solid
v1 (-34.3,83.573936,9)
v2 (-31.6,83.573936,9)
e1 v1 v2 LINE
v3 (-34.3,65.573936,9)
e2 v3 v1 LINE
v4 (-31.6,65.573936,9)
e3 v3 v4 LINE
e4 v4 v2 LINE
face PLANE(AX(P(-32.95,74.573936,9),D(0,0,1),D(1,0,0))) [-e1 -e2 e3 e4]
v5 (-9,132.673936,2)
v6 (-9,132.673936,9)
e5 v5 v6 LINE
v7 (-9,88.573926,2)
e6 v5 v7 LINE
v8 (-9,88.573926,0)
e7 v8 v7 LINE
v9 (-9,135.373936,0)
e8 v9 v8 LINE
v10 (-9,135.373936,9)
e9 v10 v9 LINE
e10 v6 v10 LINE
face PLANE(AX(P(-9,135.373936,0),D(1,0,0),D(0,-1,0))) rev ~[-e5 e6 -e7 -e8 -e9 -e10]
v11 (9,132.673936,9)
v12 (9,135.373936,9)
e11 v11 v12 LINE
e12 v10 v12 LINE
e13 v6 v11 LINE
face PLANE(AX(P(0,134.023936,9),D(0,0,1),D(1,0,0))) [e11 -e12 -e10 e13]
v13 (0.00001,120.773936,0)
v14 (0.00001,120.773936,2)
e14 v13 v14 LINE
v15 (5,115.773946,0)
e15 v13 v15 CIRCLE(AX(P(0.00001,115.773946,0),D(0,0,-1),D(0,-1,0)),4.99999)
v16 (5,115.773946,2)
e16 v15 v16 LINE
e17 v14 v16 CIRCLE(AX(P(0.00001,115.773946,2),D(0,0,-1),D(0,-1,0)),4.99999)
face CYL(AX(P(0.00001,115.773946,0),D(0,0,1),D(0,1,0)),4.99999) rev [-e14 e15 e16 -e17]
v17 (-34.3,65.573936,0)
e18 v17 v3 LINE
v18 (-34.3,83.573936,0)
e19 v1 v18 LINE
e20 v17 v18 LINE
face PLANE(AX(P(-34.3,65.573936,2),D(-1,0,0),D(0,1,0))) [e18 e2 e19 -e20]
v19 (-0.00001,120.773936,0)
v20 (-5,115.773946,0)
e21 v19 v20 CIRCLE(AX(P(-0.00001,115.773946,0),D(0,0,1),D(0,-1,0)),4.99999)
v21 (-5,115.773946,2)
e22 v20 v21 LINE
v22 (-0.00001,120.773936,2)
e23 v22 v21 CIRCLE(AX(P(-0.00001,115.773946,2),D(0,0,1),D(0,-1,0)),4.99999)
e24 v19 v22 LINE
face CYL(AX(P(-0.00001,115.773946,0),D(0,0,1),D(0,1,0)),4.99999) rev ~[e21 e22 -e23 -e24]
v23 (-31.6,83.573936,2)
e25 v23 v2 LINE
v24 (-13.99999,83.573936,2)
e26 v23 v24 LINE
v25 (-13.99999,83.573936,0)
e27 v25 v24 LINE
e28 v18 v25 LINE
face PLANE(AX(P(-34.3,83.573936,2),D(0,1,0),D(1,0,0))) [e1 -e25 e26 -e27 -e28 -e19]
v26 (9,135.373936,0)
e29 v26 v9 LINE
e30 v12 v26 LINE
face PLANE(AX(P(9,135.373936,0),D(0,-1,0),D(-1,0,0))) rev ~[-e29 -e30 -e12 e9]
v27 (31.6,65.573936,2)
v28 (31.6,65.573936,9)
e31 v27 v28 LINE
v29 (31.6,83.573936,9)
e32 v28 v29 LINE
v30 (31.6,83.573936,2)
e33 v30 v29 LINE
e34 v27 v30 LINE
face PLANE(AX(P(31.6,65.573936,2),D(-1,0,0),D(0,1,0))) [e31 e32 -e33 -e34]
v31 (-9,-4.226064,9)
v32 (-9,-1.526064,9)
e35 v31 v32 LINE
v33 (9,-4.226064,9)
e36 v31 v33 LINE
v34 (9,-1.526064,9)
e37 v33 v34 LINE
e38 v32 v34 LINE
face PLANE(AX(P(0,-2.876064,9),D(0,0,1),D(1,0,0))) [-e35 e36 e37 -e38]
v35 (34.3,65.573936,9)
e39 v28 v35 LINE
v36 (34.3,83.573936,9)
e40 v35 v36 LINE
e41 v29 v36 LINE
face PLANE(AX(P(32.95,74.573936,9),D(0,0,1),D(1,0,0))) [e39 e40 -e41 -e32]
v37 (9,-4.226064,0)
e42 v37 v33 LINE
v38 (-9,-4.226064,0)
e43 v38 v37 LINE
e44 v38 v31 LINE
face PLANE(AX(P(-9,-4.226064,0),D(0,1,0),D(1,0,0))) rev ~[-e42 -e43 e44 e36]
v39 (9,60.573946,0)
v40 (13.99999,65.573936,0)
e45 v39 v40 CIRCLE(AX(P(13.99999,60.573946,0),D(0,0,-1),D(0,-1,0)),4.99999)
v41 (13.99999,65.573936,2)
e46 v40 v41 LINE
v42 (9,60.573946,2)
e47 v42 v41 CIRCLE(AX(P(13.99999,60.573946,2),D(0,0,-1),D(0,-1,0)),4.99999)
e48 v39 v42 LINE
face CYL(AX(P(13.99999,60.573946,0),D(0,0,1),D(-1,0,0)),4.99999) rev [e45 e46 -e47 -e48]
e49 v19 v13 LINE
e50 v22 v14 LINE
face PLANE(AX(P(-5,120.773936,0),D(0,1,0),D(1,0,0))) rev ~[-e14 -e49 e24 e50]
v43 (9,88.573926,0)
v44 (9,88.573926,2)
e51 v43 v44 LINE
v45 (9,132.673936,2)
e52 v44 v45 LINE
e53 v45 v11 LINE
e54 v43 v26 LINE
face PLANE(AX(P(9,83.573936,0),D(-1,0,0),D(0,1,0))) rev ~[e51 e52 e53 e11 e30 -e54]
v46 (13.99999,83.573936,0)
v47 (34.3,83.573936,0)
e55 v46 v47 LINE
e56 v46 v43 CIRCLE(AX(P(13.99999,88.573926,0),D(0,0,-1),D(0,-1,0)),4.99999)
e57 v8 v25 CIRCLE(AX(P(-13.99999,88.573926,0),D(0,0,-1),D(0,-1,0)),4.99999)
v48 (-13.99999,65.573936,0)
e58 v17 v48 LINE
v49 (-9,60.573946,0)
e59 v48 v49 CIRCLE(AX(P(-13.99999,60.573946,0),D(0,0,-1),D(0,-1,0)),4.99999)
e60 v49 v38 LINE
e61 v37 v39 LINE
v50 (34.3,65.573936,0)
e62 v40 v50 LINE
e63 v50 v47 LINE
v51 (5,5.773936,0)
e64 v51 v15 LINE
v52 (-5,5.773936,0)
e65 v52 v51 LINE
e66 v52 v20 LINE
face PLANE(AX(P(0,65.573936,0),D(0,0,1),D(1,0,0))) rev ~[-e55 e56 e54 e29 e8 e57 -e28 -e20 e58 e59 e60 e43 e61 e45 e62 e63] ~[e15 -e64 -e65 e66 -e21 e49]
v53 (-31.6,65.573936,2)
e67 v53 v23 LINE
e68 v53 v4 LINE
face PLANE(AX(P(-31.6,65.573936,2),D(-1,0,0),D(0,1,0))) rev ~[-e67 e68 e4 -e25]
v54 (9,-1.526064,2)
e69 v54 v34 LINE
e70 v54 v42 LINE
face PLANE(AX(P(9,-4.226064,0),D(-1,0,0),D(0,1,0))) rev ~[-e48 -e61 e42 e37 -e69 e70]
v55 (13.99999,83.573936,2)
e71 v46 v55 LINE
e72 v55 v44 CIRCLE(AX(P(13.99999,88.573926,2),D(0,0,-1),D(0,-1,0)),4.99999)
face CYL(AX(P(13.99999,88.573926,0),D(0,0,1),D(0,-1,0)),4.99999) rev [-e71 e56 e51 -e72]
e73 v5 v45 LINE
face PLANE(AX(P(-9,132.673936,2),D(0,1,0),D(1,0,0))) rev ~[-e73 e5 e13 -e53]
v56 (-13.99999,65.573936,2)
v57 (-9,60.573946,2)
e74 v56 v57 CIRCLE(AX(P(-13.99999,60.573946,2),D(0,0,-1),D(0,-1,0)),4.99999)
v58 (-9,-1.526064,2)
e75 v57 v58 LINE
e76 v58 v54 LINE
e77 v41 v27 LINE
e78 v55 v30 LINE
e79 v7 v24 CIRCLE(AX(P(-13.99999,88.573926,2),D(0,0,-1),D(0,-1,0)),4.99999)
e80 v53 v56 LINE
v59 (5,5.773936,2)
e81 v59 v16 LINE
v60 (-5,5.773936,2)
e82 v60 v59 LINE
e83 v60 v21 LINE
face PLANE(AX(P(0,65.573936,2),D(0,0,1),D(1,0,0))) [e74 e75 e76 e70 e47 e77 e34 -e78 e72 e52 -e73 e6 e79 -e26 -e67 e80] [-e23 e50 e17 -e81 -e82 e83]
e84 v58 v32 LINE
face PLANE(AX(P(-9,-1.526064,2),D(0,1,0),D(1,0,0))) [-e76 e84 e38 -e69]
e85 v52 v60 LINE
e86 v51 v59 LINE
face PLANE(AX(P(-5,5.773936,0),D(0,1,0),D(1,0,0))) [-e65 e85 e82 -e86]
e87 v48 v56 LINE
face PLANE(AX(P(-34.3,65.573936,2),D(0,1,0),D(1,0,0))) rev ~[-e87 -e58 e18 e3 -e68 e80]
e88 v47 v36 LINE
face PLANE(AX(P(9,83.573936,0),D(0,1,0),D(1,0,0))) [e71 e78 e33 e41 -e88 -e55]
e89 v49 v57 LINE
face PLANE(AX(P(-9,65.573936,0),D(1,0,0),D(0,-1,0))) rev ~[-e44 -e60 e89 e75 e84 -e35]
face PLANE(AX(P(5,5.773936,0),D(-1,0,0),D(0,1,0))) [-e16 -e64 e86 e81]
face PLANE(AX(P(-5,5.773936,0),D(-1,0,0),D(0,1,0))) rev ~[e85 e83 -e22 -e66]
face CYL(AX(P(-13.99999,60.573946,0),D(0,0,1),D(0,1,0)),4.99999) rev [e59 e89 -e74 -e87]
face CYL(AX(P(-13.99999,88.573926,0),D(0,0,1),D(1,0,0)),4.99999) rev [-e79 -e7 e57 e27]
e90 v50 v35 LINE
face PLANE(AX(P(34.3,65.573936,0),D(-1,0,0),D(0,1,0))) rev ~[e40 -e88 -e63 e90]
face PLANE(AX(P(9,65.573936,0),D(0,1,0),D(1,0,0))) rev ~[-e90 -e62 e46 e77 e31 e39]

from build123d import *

# Parameters (mm, degrees)
F0_W     = 10
F0_H     = 115
F0_W_2   = 25.3
F0_H_2   = 18
F1_DEPTH = 2
F3_W     = 2.7
F3_H     = 18
F3_W_2   = 18
F3_H_2   = 2.7
F4_DEPTH = 7
F5_R     = 4.99999


# Not quite as in the source:
# - a fillet or chamfer is up to 0.001 mm smaller than in the source, because OpenCascade refuses the exact size


with BuildPart() as f1:
    # F0 (on Top) → F1 (new body)
    with BuildSketch(Plane.XY):
        Polygon((9, 135.3739356415), (-9, 135.3739356415), (-9, 83.5739356415), (-9, 65.5739356415), (-9, -4.2260643585), (9, -4.2260643585), (9, 65.5739356415), (9, 83.5739356415), align=None)
        with Locations((0, 63.2739356415)):
            Rectangle(F0_W, F0_H, mode=Mode.SUBTRACT)
        with Locations((-21.65, 74.5739356415)):
            Rectangle(F0_W_2, F0_H_2)
        with Locations((21.65, 74.5739356415)):
            Rectangle(F0_W_2, F0_H_2)
    extrude(amount=F1_DEPTH)

    # F3 (on face) → F4 (join)
    with BuildSketch(Plane.XY.offset(2)):
        with Locations((-32.95, 74.5739356415)):
            Rectangle(F3_W, F3_H)
        with Locations((32.95, 74.5739356415)):
            Rectangle(F3_W, F3_H)
        with Locations((0, 134.0239356415)):
            Rectangle(F3_W_2, F3_H_2)
        with Locations((0, -2.8760643585)):
            Rectangle(F3_W_2, F3_H_2)
    extrude(amount=F4_DEPTH)

    # F5 (radius 5 in the source; OpenCascade refuses exactly that, so slightly less here)
    f5_edges = [f1.edges().sort_by_distance(p)[0] for p in [
        (-9, 65.573936, 1),
        (9, 65.573936, 1),
        (9, 83.573936, 1),
        (-9, 83.573936, 1),
        (-5, 120.773936, 1),
        (5, 120.773936, 1),
    ]]
    fillet(f5_edges, radius=F5_R)


solid = f1.part
